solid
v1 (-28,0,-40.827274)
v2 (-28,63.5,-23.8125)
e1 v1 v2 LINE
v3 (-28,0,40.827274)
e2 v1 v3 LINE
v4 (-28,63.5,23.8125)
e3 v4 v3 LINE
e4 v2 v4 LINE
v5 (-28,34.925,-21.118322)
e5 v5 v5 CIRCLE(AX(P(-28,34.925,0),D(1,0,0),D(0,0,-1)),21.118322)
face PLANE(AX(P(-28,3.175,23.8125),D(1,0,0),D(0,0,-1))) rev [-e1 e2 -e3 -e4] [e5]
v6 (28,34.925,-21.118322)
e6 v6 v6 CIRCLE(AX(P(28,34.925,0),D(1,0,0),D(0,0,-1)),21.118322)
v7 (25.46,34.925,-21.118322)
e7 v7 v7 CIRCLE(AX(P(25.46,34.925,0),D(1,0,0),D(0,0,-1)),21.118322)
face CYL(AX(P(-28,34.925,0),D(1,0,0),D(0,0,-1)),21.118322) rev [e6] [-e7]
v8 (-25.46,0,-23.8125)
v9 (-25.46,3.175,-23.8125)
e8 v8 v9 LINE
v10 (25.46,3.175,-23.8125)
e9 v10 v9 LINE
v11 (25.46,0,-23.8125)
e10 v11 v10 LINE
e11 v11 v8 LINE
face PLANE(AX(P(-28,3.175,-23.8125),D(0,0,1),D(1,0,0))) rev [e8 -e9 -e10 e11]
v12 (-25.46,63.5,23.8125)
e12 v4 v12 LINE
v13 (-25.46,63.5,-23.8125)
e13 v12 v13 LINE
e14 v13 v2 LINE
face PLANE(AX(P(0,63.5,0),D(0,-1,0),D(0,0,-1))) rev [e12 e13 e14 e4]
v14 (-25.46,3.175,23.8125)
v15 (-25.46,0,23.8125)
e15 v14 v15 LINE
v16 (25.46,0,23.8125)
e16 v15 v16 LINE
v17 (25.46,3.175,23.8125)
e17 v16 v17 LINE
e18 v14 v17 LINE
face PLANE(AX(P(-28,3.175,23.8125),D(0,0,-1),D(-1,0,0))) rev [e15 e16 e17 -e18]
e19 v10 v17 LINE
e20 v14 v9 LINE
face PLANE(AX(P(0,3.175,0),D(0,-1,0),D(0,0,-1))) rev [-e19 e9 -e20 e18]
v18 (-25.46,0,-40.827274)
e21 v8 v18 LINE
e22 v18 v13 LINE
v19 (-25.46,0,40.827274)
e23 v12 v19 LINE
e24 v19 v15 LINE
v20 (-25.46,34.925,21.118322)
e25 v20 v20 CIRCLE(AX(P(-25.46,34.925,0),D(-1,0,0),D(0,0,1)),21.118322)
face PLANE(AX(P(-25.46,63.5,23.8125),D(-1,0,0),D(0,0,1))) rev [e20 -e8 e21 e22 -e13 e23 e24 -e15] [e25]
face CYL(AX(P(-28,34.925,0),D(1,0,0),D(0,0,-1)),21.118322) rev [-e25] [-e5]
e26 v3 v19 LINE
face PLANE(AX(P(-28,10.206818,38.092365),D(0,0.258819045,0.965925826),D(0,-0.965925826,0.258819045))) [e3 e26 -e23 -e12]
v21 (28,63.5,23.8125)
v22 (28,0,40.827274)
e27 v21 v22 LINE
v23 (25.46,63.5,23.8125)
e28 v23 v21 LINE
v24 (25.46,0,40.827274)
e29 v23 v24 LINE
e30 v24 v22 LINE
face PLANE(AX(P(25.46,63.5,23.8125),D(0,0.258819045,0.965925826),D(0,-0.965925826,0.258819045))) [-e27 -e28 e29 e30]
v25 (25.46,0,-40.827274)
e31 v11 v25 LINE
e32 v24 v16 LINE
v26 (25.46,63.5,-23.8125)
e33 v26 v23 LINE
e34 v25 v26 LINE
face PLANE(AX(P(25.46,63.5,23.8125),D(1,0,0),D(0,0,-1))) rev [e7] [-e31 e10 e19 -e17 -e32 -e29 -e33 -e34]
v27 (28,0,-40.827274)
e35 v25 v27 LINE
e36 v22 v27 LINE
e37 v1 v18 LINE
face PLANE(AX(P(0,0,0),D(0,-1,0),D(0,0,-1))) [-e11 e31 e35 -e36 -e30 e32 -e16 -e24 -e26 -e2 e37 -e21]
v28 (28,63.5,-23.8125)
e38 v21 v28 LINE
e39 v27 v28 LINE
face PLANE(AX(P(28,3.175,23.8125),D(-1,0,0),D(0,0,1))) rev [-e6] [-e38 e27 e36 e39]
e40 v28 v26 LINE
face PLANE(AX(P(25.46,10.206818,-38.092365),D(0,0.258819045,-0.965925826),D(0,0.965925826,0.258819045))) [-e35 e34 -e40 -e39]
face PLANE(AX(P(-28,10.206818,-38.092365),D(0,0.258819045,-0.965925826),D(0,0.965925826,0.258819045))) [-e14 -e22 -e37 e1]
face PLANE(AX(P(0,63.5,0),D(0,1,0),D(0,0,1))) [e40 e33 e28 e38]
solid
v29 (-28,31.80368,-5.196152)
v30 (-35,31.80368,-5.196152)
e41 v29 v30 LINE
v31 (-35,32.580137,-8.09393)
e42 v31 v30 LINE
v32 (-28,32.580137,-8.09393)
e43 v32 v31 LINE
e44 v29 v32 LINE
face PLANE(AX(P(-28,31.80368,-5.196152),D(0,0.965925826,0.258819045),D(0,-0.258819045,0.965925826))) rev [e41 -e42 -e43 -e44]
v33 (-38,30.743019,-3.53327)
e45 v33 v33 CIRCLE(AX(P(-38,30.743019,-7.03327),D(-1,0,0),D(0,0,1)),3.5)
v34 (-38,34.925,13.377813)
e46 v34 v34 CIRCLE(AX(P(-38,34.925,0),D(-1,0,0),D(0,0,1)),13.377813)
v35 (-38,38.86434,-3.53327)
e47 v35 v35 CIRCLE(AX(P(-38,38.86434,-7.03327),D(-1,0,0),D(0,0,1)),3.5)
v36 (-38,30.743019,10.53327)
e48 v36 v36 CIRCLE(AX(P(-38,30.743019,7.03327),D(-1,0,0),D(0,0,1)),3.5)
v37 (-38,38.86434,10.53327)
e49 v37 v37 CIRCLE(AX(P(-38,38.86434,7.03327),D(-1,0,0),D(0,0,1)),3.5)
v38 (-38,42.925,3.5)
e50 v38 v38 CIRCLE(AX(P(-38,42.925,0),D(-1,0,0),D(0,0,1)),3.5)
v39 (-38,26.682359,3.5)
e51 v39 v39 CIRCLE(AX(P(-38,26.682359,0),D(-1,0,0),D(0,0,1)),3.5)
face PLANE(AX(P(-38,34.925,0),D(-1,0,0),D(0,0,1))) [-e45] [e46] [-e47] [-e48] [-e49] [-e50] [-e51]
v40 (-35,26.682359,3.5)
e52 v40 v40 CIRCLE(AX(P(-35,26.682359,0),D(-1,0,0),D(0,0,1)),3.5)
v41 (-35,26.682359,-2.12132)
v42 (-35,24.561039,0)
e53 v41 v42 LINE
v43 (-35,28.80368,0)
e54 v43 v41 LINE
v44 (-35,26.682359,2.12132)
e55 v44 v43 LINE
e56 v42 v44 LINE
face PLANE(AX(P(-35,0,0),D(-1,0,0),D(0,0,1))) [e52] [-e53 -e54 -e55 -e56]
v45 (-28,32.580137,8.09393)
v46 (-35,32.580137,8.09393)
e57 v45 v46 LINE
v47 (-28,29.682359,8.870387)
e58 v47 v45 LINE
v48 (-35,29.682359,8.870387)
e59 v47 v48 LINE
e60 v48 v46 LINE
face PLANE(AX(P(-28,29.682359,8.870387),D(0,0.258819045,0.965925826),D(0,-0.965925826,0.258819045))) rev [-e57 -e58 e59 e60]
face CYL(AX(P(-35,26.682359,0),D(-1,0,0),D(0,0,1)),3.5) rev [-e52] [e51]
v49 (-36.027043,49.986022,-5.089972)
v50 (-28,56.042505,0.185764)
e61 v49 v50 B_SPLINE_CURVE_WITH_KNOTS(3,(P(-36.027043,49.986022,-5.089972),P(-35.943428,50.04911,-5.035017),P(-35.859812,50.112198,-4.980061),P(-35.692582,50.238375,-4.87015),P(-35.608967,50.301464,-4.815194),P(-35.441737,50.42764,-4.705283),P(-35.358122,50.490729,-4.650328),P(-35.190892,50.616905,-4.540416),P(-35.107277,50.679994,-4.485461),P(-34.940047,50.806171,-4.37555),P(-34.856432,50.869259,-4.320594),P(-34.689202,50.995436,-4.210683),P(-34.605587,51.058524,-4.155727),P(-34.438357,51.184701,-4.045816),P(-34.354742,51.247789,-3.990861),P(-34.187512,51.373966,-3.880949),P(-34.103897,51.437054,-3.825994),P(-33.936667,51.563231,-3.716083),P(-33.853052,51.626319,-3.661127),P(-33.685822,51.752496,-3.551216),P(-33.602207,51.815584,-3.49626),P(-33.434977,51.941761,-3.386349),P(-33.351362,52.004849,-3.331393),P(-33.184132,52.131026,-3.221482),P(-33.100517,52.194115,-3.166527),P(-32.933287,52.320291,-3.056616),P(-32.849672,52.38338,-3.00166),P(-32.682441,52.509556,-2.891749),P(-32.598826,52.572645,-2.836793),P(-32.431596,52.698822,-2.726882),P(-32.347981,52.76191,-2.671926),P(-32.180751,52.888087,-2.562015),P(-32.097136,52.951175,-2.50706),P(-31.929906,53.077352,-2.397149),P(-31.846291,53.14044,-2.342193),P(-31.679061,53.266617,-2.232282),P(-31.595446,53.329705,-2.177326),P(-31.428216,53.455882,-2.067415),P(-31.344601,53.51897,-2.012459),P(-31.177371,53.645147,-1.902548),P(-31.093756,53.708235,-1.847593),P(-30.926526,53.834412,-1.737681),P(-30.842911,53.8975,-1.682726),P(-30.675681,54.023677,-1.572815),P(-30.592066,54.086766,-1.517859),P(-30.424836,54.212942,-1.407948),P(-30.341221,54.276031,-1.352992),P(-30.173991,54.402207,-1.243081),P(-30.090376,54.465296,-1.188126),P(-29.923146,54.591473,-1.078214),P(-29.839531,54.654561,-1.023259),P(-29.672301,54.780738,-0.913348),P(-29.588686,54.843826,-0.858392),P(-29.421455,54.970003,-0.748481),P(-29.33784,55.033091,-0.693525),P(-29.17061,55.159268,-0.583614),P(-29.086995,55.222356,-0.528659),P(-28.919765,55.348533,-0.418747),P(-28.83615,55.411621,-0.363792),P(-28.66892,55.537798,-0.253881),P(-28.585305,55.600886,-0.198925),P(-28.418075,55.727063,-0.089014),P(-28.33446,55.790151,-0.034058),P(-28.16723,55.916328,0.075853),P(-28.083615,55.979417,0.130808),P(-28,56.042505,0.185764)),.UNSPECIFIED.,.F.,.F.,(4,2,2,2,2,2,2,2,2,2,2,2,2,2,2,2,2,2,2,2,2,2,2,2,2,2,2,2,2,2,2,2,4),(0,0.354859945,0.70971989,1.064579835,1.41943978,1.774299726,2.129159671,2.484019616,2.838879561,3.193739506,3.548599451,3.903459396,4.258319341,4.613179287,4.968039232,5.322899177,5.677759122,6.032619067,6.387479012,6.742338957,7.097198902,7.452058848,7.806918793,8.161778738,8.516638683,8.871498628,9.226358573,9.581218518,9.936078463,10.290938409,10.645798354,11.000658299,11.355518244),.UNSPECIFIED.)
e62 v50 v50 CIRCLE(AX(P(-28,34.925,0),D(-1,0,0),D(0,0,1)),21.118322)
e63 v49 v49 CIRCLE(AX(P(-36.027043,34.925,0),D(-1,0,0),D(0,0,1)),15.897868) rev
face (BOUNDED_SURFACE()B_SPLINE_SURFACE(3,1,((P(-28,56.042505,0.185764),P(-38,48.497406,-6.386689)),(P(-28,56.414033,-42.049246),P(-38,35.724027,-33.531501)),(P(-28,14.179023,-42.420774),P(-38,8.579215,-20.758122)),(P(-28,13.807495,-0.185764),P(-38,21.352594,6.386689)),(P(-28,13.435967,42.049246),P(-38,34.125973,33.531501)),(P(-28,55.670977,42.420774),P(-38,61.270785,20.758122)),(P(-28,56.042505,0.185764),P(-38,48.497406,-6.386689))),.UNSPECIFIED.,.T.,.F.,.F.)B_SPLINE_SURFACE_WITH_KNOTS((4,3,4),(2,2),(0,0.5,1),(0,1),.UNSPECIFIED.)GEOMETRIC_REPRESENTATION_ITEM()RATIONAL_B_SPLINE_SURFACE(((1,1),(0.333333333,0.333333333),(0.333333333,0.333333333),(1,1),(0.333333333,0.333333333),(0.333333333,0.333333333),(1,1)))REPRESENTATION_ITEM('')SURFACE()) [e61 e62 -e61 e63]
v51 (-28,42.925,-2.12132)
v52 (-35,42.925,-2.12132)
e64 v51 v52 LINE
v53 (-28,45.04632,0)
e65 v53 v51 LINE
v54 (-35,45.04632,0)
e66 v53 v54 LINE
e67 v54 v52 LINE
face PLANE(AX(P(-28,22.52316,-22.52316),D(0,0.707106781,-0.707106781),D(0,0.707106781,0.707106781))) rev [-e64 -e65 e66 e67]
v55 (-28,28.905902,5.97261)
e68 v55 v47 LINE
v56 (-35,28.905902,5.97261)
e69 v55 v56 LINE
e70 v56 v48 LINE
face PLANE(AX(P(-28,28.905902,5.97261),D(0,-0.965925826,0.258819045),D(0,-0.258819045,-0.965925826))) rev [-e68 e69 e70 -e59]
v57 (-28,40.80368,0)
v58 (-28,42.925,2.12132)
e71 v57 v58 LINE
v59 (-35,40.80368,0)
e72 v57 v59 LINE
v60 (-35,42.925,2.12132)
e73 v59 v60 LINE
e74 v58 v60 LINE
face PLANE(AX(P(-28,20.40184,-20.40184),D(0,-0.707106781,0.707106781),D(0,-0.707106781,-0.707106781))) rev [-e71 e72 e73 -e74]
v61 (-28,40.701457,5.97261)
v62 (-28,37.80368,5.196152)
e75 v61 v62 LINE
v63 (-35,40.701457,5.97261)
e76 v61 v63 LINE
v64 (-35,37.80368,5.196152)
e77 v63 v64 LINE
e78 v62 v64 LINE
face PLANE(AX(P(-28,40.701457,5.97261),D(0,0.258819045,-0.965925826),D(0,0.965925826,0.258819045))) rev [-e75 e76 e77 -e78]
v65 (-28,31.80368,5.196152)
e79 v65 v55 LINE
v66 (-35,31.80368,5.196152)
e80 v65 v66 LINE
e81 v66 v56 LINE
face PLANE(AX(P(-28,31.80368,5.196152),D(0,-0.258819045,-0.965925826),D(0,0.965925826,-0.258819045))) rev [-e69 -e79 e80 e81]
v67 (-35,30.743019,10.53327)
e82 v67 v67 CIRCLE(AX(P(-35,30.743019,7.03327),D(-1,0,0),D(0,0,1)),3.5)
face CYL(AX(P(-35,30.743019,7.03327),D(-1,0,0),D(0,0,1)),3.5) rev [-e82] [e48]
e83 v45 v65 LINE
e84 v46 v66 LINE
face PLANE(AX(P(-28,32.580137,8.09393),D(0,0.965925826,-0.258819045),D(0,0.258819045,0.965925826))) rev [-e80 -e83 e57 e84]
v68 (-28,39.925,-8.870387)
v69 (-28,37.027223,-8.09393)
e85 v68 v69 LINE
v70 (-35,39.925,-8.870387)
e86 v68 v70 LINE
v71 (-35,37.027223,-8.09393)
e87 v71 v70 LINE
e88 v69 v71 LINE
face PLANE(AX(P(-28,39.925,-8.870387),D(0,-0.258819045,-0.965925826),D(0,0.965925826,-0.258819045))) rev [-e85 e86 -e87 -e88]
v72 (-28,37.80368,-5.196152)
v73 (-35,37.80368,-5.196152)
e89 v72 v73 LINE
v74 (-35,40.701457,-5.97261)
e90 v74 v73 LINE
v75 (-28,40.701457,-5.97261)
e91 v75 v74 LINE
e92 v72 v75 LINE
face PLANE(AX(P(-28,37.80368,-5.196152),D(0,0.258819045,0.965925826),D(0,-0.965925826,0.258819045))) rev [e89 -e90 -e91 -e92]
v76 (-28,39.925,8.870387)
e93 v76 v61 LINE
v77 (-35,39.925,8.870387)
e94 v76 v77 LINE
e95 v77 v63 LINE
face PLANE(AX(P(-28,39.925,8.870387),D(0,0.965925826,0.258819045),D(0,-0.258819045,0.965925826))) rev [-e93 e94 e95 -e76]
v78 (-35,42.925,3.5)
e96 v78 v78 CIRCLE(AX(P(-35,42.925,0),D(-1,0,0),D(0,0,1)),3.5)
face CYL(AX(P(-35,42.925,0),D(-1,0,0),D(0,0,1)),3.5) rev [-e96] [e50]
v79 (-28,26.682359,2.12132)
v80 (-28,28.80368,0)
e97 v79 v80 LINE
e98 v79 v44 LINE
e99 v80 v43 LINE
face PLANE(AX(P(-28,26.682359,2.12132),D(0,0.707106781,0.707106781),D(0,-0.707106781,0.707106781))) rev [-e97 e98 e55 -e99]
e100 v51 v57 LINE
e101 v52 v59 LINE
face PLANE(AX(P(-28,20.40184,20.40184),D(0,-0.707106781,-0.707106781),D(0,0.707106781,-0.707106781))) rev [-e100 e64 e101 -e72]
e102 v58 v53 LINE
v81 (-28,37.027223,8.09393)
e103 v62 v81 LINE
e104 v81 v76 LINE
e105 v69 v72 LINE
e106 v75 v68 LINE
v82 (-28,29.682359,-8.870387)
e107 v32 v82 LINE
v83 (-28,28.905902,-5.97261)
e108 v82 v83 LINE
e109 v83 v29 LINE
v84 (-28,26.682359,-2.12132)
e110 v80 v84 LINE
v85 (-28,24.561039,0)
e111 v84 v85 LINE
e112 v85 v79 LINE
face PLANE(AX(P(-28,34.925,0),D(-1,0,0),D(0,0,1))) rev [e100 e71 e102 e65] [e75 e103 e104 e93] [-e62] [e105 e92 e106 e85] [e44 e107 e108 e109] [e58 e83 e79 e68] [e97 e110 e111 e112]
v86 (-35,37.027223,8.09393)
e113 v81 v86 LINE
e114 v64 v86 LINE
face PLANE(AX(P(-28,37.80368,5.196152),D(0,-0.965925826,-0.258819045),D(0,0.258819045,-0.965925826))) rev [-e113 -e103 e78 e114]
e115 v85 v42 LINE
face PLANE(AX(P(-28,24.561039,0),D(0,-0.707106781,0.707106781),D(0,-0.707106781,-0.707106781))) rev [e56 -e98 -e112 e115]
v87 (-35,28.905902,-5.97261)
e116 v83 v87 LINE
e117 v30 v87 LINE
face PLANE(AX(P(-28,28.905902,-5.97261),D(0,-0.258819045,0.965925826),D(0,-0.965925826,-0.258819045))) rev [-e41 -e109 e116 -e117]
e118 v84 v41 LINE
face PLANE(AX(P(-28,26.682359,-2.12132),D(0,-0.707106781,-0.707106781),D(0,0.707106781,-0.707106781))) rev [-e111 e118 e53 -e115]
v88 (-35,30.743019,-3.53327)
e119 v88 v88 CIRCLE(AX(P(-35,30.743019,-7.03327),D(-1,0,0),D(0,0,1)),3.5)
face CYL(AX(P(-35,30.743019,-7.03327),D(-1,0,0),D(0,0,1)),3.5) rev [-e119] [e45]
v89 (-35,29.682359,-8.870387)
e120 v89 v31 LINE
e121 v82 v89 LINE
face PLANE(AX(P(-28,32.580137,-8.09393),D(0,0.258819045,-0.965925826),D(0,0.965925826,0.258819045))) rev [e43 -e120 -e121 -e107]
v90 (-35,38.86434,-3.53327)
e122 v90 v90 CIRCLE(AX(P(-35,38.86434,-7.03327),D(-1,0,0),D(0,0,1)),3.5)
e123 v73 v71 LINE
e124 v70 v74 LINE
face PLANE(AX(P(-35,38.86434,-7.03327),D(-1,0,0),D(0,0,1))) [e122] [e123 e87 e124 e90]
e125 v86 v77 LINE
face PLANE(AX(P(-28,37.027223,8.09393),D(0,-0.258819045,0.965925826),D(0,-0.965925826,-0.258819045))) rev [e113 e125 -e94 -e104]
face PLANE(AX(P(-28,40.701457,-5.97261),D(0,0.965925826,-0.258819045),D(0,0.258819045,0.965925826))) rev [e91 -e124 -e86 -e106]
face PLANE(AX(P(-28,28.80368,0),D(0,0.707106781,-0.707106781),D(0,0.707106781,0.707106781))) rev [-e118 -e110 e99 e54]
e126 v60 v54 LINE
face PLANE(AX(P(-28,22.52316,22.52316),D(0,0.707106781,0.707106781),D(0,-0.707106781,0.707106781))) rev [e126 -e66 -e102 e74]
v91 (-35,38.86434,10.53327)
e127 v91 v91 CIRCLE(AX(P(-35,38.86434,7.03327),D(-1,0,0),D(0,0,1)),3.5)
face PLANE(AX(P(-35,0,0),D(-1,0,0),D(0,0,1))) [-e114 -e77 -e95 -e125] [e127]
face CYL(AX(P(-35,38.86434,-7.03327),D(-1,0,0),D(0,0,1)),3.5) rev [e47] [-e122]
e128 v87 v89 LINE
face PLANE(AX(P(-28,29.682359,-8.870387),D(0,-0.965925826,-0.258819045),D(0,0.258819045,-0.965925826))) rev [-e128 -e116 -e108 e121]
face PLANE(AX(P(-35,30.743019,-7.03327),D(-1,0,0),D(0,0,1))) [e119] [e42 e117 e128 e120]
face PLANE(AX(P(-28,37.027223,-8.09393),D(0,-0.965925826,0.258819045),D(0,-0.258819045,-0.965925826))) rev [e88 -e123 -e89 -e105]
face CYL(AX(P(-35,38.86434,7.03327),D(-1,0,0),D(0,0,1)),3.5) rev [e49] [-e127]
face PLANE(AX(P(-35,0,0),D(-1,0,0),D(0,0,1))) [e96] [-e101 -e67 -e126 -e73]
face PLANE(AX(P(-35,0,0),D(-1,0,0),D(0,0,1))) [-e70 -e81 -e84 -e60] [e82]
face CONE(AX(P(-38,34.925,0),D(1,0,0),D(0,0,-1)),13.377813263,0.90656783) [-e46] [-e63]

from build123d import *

# Parameters (mm, degrees)
SKETCH1_W           = 56
SKETCH1_H           = 47.625
BOSS_EXTRUDE1_DEPTH = 3.175
SKETCH3_W           = 2.54
SKETCH3_H           = 47.625
BOSS_EXTRUDE3_DEPTH = 60.325
SKETCH4_R           = 21.118322
CUT_EXTRUDE1_DEPTH  = 88.950469904
BOSS_EXTRUDE6_DEPTH = 2.54
BOSS_EXTRUDE7_DEPTH = 2.54
CUT_EXTRUDE4_DEPTH  = 10
SKETCH15_3_R        = 3.5
CUT_EXTRUDE5_DEPTH  = 3


with BuildPart() as part:
    # Sketch1 → Boss-Extrude1 (new body)
    with BuildSketch(Plane(origin=(0, 0, 0), x_dir=(1, 0, 0), z_dir=(0, 1, 0))):
        Rectangle(SKETCH1_W, SKETCH1_H)
    extrude(amount=BOSS_EXTRUDE1_DEPTH)

    # Sketch3 → Boss-Extrude3 (add)
    with BuildSketch(Plane(origin=(0, 3.175, 0), x_dir=(1, 0, 0), z_dir=(0, 1, 0))):
        with Locations((-26.73, 0)):
            Rectangle(SKETCH3_W, SKETCH3_H)
        with Locations((26.73, 0)):
            Rectangle(SKETCH3_W, SKETCH3_H)
    extrude(amount=BOSS_EXTRUDE3_DEPTH)

    # Sketch4 → Cut-Extrude1 (cut, through all)
    with BuildSketch(Plane(origin=(28, 0, 0), x_dir=(0, 0, -1), z_dir=(1, 0, 0))):
        with Locations((0, 34.925)):
            Circle(SKETCH4_R)
    extrude(amount=-CUT_EXTRUDE1_DEPTH, mode=Mode.SUBTRACT)

    # Sketch8 → Boss-Extrude6 (add)
    with BuildSketch(Plane(origin=(-25.46, 0, 0), x_dir=(0, 0, -1), z_dir=(1, 0, 0))):
        Polygon((23.8125, 63.5), (23.8125, 3.175), (23.8125, 0), (40.827273719, 0), align=None)
        Polygon((-23.8125, 63.5), (-40.827273719, 0), (-23.8125, 0), (-23.8125, 3.175), align=None)
    extrude(amount=-BOSS_EXTRUDE6_DEPTH)

    # Sketch9 → Boss-Extrude7 (add)
    with BuildSketch(Plane(origin=(28, 0, 0), x_dir=(0, 0, -1), z_dir=(1, 0, 0))):
        Polygon((23.8125, 0), (40.827273719, 0), (23.8125, 63.5), align=None)
        Polygon((-23.8125, 63.5), (-40.827273719, 0), (-23.8125, 0), align=None)
    extrude(amount=-BOSS_EXTRUDE7_DEPTH)


with BuildPart() as body_2:
    # Loft1: read off the stored shape, not the designer's step
    # Loft1: loft between two sections, ruled curve by curve
    loft1_from = [
        Edge.make_bspline([(-28, 56.042504962, 0.185764067), (-28, 56.414033096, -42.049245856), (-28, 14.179023172, -42.42077399), (-28, 13.807495038, -0.185764067), (-28, 13.435966904, 42.049245856), (-28, 55.670976828, 42.42077399), (-28, 56.042504962, 0.185764067)], [0, 0, 0, 0, 0.5, 0.5, 0.5, 1, 1, 1, 1], 3, [1, 0.333333333, 0.333333333, 1, 0.333333333, 0.333333333, 1]),
    ]
    loft1_to = [
        Edge.make_bspline([(-38, 48.497405787, -6.386689373), (-38, 35.72402704, -33.531500947), (-38, 8.579215466, -20.758122201), (-38, 21.352594213, 6.386689373), (-38, 34.12597296, 33.531500947), (-38, 61.270784534, 20.758122201), (-38, 48.497405787, -6.386689373)], [0, 0, 0, 0, 0.5, 0.5, 0.5, 1, 1, 1, 1], 3, [1, 0.333333333, 0.333333333, 1, 0.333333333, 0.333333333, 1]),
    ]
    loft1 = Solid(Shell([*[Face.make_surface_from_curves(loft1_from[k], loft1_to[k]) for k in range(1)], Face(Wire(loft1_from)), Face(Wire(loft1_to))]))
    add(loft1)

    # Chamfer1: read off the stored shape, not the designer's step
    # Chamfer1 outline → Chamfer1 (revolve, cut)
    with BuildSketch(Plane(origin=(0, 34.925, 0), x_dir=(0, 1, 0), z_dir=(0, 0, -1))):
        Polygon((15.897867596, -36.027042539), (13.377813263, -38), (15.897867596, -38), align=None)
    revolve(axis=Axis((0, 34.925, 0), (1, 0, 0)), mode=Mode.SUBTRACT)

    # Sketch15 → Cut-Extrude4 (cut)
    with BuildSketch(Plane.ZY.offset(38)):
        Polygon((-2.121320344, 42.925), (0, 40.803679656), (2.121320344, 42.925), (0, 45.046320344), align=None)
        Polygon((-5.972609558, 40.701457135), (-8.870387037, 39.925), (-8.093929902, 37.027222521), (-5.196152423, 37.803679656), align=None)
        Polygon((-8.093929902, 32.580136792), (-8.870387037, 29.682359313), (-5.972609558, 28.905902178), (-5.196152423, 31.803679656), align=None)
        Polygon((0, 28.803679656), (-2.121320344, 26.682359313), (0, 24.561038969), (2.121320344, 26.682359313), align=None)
        Polygon((8.870387037, 29.682359313), (8.093929902, 32.580136792), (5.196152423, 31.803679656), (5.972609558, 28.905902178), align=None)
        Polygon((8.093929902, 37.027222521), (8.870387037, 39.925), (5.972609558, 40.701457135), (5.196152423, 37.803679656), align=None)
    extrude(amount=-CUT_EXTRUDE4_DEPTH, mode=Mode.SUBTRACT)

    # Sketch15<3> → Cut-Extrude5 (cut)
    # profile 1 of 6: a face of its own
    with BuildSketch(Plane.ZY.offset(38)):
        with Locations((0, 42.925)):
            Circle(SKETCH15_3_R)
        Polygon((0, 45.046320344), (2.121320344, 42.925), (0, 40.803679656), (-2.121320344, 42.925), align=None, mode=Mode.SUBTRACT)
    # profile 2 of 6: a face of its own
    with BuildSketch(Plane.ZY.offset(38)):
        with Locations((7.03326973, 38.864339828)):
            Circle(SKETCH15_3_R)
        Polygon((5.972609558, 40.701457135), (8.870387037, 39.925), (8.093929902, 37.027222521), (5.196152423, 37.803679656), align=None, mode=Mode.SUBTRACT)
    # profile 3 of 6: a face of its own
    with BuildSketch(Plane.ZY.offset(38)):
        with Locations((7.03326973, 30.743019485)):
            Circle(SKETCH15_3_R)
        Polygon((8.093929902, 32.580136792), (8.870387037, 29.682359313), (5.972609558, 28.905902178), (5.196152423, 31.803679656), align=None, mode=Mode.SUBTRACT)
    # profile 4 of 6: a face of its own
    with BuildSketch(Plane.ZY.offset(38)):
        with Locations((0, 26.682359313)):
            Circle(SKETCH15_3_R)
        Polygon((2.121320344, 26.682359313), (0, 24.561038969), (-2.121320344, 26.682359313), (0, 28.803679656), align=None, mode=Mode.SUBTRACT)
    # profile 5 of 6: a face of its own
    with BuildSketch(Plane.ZY.offset(38)):
        with Locations((-7.03326973, 30.743019485)):
            Circle(SKETCH15_3_R)
        Polygon((-5.972609558, 28.905902178), (-8.870387037, 29.682359313), (-8.093929902, 32.580136792), (-5.196152423, 31.803679656), align=None, mode=Mode.SUBTRACT)
    # profile 6 of 6: a face of its own
    with BuildSketch(Plane.ZY.offset(38)):
        with Locations((-7.03326973, 38.864339828)):
            Circle(SKETCH15_3_R)
        Polygon((-8.093929902, 37.027222521), (-8.870387037, 39.925), (-5.972609558, 40.701457135), (-5.196152423, 37.803679656), align=None, mode=Mode.SUBTRACT)
    extrude(amount=-CUT_EXTRUDE5_DEPTH, mode=Mode.SUBTRACT)


solid = Compound([part.part, body_2.part])
